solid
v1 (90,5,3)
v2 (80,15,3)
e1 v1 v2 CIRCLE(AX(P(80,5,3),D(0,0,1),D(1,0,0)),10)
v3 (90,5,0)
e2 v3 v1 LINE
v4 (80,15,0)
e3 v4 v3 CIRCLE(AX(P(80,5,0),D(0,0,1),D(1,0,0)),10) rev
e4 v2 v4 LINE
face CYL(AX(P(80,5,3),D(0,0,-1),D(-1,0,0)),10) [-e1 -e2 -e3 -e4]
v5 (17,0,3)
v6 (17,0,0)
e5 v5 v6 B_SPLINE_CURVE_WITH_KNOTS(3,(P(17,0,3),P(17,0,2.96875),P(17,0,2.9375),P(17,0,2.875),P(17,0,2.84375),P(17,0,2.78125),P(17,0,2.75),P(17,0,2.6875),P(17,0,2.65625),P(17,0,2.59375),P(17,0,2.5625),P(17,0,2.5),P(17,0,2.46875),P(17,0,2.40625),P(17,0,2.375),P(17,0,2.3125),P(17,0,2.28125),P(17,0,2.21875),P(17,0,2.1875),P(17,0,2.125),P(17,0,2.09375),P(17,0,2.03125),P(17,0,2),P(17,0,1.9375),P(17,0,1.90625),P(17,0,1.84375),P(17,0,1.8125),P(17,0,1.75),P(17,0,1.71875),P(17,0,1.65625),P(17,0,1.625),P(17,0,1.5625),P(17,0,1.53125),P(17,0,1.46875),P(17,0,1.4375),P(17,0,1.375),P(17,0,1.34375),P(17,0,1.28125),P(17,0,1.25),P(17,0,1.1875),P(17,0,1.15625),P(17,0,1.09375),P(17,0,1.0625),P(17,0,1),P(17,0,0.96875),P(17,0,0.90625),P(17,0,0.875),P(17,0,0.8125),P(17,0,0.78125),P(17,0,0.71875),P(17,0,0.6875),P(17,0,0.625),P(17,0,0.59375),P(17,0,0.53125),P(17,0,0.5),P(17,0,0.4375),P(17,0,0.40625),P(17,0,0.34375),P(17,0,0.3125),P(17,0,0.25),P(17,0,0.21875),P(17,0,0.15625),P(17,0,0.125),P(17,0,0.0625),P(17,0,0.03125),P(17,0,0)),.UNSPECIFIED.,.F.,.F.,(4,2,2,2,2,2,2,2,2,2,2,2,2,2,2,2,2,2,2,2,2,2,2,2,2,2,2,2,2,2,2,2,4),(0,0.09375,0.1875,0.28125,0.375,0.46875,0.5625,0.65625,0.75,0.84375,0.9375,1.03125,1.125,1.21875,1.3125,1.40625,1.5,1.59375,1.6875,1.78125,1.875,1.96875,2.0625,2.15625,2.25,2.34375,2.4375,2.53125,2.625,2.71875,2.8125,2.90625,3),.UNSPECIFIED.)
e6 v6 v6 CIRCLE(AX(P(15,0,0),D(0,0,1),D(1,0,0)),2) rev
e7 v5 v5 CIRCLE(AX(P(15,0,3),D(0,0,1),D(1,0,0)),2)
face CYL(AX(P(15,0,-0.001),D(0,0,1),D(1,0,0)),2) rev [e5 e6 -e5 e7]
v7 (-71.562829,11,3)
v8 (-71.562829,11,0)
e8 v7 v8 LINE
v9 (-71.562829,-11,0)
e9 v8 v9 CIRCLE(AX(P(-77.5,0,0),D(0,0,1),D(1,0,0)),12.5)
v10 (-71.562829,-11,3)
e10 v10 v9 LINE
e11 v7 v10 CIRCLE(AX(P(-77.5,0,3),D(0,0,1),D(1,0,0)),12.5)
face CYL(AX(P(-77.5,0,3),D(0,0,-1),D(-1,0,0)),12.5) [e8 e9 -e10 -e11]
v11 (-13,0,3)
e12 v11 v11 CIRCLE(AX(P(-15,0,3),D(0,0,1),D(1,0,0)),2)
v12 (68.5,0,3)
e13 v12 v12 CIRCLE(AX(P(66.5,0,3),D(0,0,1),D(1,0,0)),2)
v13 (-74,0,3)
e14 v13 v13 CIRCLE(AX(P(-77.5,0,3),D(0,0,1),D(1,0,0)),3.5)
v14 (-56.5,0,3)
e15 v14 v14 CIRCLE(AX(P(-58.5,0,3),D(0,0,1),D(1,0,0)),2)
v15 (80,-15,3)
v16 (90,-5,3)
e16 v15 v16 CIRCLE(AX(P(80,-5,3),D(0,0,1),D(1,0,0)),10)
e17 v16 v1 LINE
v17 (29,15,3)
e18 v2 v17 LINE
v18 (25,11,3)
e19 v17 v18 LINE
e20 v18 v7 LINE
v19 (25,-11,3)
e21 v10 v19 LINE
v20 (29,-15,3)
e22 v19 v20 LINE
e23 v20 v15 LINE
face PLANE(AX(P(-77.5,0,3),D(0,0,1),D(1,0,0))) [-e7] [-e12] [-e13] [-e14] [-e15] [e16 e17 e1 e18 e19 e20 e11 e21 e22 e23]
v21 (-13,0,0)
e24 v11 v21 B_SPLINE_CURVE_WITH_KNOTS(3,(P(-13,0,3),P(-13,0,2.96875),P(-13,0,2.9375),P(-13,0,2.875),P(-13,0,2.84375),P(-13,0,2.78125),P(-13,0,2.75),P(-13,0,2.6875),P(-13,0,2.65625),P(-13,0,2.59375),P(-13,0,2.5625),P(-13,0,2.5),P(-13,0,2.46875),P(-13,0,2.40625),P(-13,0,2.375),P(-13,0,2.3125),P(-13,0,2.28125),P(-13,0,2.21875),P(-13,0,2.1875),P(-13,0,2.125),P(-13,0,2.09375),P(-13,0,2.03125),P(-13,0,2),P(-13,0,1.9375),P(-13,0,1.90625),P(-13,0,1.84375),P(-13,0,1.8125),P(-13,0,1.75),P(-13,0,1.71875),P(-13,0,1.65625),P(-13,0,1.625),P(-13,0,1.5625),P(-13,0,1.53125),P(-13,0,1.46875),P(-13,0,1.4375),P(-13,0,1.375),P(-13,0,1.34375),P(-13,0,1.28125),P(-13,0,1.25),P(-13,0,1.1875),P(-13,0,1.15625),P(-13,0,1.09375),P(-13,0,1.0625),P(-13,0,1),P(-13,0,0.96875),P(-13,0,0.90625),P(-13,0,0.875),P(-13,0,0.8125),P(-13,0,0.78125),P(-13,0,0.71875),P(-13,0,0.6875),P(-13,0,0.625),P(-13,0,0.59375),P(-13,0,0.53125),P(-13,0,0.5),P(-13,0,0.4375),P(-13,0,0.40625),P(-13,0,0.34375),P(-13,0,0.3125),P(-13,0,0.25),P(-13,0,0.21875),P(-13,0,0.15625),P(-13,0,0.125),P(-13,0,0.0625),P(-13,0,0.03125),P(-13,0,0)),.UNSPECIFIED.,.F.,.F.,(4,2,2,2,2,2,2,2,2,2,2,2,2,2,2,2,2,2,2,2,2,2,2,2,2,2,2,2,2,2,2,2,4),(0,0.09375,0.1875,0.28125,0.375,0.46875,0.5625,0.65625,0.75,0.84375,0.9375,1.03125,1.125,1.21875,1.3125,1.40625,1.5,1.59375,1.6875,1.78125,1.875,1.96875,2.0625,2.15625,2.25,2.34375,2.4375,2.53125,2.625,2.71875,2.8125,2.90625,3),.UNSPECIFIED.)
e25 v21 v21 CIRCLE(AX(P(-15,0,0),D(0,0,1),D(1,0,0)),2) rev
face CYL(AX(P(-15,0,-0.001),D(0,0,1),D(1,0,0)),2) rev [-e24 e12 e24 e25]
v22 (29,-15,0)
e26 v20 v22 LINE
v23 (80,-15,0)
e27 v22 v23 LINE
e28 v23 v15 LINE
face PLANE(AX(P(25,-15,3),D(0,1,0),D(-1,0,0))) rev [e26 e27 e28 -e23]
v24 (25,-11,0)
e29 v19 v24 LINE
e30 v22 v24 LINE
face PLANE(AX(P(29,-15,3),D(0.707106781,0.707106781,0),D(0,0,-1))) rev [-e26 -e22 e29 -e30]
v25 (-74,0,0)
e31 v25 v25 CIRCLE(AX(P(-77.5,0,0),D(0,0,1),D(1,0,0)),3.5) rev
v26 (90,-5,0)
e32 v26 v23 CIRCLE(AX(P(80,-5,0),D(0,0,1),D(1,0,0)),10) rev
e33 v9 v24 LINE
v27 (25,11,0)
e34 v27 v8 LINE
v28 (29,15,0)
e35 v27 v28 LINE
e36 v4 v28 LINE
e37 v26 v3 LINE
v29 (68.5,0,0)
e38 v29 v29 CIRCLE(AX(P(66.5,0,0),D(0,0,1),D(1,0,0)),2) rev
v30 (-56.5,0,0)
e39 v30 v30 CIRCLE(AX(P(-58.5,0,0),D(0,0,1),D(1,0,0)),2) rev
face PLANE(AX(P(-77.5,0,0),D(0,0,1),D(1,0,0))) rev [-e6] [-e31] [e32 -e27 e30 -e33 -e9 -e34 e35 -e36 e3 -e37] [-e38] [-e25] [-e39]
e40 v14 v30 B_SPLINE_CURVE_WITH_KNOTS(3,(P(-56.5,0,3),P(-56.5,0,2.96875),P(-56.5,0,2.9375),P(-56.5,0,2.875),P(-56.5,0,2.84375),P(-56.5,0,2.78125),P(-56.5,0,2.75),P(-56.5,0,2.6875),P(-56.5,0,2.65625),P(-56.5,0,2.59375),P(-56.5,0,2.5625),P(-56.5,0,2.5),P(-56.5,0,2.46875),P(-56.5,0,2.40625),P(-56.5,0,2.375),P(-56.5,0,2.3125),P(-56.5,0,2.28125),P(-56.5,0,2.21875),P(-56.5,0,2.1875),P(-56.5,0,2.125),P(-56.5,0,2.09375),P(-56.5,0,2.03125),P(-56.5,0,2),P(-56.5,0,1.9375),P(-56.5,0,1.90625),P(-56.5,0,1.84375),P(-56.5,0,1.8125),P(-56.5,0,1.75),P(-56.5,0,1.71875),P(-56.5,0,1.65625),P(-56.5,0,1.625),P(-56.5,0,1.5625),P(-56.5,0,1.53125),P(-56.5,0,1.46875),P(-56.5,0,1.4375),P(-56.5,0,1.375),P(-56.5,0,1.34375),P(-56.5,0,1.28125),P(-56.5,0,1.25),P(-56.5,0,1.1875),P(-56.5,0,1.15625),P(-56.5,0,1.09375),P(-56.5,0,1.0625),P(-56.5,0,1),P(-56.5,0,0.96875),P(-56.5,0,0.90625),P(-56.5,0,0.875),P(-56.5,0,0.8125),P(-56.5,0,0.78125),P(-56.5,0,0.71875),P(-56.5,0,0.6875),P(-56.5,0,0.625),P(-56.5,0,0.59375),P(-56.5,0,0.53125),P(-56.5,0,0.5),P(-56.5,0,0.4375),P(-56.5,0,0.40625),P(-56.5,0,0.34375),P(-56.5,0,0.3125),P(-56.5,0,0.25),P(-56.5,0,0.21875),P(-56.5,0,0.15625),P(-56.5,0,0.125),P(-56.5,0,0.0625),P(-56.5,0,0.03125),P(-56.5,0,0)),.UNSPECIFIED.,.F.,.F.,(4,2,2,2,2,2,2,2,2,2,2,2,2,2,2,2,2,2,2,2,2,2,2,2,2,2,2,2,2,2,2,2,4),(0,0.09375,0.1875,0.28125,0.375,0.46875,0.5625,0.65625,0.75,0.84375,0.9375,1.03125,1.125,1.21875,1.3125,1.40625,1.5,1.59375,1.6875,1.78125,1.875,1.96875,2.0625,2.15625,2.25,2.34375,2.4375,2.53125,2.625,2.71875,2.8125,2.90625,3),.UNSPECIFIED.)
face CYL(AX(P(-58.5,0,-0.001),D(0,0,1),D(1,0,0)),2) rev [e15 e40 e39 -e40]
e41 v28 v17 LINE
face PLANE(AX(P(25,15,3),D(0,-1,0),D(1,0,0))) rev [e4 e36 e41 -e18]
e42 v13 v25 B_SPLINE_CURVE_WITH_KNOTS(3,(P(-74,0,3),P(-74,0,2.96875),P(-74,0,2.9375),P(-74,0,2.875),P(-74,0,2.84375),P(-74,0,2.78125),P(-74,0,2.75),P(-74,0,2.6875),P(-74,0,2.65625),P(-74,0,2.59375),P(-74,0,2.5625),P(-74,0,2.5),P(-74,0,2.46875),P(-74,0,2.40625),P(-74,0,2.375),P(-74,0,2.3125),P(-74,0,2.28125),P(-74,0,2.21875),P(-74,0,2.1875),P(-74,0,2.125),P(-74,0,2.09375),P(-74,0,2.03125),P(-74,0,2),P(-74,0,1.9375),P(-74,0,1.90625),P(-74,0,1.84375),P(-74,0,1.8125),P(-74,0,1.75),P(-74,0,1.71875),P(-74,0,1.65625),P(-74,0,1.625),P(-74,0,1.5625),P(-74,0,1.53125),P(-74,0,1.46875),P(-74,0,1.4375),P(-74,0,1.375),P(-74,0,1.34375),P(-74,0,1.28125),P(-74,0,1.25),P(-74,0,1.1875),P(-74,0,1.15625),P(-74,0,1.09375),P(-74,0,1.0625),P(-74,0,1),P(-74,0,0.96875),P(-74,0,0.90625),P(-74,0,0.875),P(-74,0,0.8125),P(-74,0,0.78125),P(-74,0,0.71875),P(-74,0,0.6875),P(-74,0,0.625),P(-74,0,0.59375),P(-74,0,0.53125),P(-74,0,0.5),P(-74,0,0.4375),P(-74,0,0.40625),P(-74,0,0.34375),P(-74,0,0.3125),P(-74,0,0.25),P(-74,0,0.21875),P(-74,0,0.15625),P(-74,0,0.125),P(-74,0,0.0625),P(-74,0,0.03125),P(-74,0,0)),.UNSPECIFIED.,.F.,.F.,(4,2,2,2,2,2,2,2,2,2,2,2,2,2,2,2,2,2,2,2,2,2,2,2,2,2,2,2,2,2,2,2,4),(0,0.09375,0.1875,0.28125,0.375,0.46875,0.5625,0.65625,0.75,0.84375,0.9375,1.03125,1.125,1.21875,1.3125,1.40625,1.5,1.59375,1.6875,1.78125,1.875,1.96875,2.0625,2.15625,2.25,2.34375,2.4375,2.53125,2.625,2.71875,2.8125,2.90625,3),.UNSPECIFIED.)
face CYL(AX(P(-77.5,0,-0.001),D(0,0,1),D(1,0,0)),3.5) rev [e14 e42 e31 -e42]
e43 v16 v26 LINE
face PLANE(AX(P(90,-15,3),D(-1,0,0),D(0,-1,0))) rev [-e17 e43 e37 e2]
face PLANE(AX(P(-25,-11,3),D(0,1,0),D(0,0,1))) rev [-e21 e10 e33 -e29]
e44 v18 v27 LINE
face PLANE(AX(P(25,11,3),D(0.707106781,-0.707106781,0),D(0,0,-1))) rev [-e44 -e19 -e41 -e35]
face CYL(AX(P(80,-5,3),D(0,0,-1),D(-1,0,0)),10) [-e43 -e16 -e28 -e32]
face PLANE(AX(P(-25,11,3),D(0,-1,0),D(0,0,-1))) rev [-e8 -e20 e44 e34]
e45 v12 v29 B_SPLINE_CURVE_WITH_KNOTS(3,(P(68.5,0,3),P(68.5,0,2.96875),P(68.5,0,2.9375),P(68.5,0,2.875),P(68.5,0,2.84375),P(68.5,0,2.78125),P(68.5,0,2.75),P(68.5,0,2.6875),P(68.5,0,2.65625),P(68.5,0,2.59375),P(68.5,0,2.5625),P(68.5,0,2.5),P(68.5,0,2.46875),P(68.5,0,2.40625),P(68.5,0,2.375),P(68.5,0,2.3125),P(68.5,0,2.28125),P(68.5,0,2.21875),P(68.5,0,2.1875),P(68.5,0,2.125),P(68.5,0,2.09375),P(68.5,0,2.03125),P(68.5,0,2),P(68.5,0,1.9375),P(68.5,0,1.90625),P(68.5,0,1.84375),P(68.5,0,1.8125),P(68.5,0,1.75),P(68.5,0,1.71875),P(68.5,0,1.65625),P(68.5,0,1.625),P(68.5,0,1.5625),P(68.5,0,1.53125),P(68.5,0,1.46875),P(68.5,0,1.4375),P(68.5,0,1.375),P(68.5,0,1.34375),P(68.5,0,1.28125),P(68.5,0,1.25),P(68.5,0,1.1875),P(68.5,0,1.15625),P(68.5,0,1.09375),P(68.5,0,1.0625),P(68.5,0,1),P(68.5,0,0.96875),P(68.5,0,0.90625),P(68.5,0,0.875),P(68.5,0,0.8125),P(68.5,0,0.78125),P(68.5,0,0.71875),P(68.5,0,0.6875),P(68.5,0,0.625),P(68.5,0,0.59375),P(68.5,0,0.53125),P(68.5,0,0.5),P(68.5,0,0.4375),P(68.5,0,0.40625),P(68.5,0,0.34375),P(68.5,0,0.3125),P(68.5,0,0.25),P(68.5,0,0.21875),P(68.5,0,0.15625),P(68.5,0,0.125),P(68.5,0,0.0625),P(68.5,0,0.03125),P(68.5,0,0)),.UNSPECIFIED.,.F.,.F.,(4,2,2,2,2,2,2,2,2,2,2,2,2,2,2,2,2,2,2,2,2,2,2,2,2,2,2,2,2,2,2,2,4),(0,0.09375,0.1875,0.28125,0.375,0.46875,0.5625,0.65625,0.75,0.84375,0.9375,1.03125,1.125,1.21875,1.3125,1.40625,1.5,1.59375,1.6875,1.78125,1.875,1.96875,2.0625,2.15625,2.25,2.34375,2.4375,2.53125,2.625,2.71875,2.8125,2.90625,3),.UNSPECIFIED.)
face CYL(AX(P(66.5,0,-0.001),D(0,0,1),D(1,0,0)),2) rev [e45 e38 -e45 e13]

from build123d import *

# Parameters (mm, degrees)
SALIENTE_EXTRUIR1_DEPTH = 3
REDONDEO1_R             = 10
CHAFL_N1_SIZE           = 4
CORTAR_EXTRUIR2_REACH   = 93.291
CROQUIS3_R              = 3.5
CROQUIS3_R_2            = 2
CORTAR_EXTRUIR3_REACH   = 93.291
CROQUIS4_R              = 2
CORTAR_EXTRUIR4_REACH   = 93.291
CROQUIS2_R              = 2


with BuildPart() as part:
    # Croquis1 → Saliente-Extruir1 (new body)
    with BuildSketch(Plane.XY):
        with BuildLine():
            Line((90, -15), (90, 15))
            Line((90, 15), (25, 15))
            Line((25, 15), (25, 11))
            Line((25, 11), (-25, 11))
            Line((-25, 11), (-71.562828956, 11))
            ThreePointArc((-71.562828956, 11), (-90, 0), (-71.562828956, -11))
            Line((-71.562828956, -11), (-25, -11))
            Line((-25, -11), (25, -11))
            Line((25, -11), (25, -15))
            Line((25, -15), (90, -15))
        make_face()
    extrude(amount=SALIENTE_EXTRUIR1_DEPTH)

    # Redondeo1
    redondeo1_edges = [part.edges().sort_by_distance(p)[0] for p in [
        (90, 15, 1.5),
        (90, -15, 1.5),
    ]]
    fillet(redondeo1_edges, radius=REDONDEO1_R)

    # Chaflán1
    chafl_n1_edges = [part.edges().sort_by_distance(p)[0] for p in [
        (25, -15, 1.5),
        (25, 15, 1.5),
    ]]
    chamfer(chafl_n1_edges, length=CHAFL_N1_SIZE - 0.0001)  # a hair under: the kernel refuses the full size

    # Croquis3 → Cortar-Extruir2 (cut, up to next)
    with BuildSketch(Plane.XY.offset(3), mode=Mode.PRIVATE) as cortar_extruir2_sk1:
        with Locations((-77.5, 0)):
            Circle(CROQUIS3_R)
    cortar_extruir2_tool1 = extrude(cortar_extruir2_sk1.sketch, amount=-CORTAR_EXTRUIR2_REACH, mode=Mode.PRIVATE) & part.part
    # Croquis3 → Cortar-Extruir2 (cut, up to next)
    with BuildSketch(Plane.XY.offset(3), mode=Mode.PRIVATE) as cortar_extruir2_sk2:
        with Locations((-58.5, 0)):
            Circle(CROQUIS3_R_2)
    cortar_extruir2_tool2 = extrude(cortar_extruir2_sk2.sketch, amount=-CORTAR_EXTRUIR2_REACH, mode=Mode.PRIVATE) & part.part
    add(cortar_extruir2_tool1.solids().sort_by_distance((-77.5, 0, 3))[0], mode=Mode.SUBTRACT)
    add(cortar_extruir2_tool2.solids().sort_by_distance((-58.5, 0, 3))[0], mode=Mode.SUBTRACT)

    # Croquis4 → Cortar-Extruir3 (cut, up to next)
    with BuildSketch(Plane.XY.offset(3), mode=Mode.PRIVATE) as cortar_extruir3_sk1:
        with Locations((-15, 0)):
            Circle(CROQUIS4_R)
    cortar_extruir3_tool1 = extrude(cortar_extruir3_sk1.sketch, amount=-CORTAR_EXTRUIR3_REACH, mode=Mode.PRIVATE) & part.part
    # Croquis4 → Cortar-Extruir3 (cut, up to next)
    with BuildSketch(Plane.XY.offset(3), mode=Mode.PRIVATE) as cortar_extruir3_sk2:
        with Locations((15, 0)):
            Circle(CROQUIS4_R)
    cortar_extruir3_tool2 = extrude(cortar_extruir3_sk2.sketch, amount=-CORTAR_EXTRUIR3_REACH, mode=Mode.PRIVATE) & part.part
    add(cortar_extruir3_tool1.solids().sort_by_distance((-15, 0, 3))[0], mode=Mode.SUBTRACT)
    add(cortar_extruir3_tool2.solids().sort_by_distance((15, 0, 3))[0], mode=Mode.SUBTRACT)

    # Croquis2 → Cortar-Extruir4 (cut, up to next)
    with BuildSketch(Plane.XY.offset(3), mode=Mode.PRIVATE) as cortar_extruir4_sk1:
        with Locations((66.5, 0)):
            Circle(CROQUIS2_R)
    cortar_extruir4_tool1 = extrude(cortar_extruir4_sk1.sketch, amount=-CORTAR_EXTRUIR4_REACH, mode=Mode.PRIVATE) & part.part
    add(cortar_extruir4_tool1.solids().sort_by_distance((66.5, 0, 3))[0], mode=Mode.SUBTRACT)


solid = part.part
